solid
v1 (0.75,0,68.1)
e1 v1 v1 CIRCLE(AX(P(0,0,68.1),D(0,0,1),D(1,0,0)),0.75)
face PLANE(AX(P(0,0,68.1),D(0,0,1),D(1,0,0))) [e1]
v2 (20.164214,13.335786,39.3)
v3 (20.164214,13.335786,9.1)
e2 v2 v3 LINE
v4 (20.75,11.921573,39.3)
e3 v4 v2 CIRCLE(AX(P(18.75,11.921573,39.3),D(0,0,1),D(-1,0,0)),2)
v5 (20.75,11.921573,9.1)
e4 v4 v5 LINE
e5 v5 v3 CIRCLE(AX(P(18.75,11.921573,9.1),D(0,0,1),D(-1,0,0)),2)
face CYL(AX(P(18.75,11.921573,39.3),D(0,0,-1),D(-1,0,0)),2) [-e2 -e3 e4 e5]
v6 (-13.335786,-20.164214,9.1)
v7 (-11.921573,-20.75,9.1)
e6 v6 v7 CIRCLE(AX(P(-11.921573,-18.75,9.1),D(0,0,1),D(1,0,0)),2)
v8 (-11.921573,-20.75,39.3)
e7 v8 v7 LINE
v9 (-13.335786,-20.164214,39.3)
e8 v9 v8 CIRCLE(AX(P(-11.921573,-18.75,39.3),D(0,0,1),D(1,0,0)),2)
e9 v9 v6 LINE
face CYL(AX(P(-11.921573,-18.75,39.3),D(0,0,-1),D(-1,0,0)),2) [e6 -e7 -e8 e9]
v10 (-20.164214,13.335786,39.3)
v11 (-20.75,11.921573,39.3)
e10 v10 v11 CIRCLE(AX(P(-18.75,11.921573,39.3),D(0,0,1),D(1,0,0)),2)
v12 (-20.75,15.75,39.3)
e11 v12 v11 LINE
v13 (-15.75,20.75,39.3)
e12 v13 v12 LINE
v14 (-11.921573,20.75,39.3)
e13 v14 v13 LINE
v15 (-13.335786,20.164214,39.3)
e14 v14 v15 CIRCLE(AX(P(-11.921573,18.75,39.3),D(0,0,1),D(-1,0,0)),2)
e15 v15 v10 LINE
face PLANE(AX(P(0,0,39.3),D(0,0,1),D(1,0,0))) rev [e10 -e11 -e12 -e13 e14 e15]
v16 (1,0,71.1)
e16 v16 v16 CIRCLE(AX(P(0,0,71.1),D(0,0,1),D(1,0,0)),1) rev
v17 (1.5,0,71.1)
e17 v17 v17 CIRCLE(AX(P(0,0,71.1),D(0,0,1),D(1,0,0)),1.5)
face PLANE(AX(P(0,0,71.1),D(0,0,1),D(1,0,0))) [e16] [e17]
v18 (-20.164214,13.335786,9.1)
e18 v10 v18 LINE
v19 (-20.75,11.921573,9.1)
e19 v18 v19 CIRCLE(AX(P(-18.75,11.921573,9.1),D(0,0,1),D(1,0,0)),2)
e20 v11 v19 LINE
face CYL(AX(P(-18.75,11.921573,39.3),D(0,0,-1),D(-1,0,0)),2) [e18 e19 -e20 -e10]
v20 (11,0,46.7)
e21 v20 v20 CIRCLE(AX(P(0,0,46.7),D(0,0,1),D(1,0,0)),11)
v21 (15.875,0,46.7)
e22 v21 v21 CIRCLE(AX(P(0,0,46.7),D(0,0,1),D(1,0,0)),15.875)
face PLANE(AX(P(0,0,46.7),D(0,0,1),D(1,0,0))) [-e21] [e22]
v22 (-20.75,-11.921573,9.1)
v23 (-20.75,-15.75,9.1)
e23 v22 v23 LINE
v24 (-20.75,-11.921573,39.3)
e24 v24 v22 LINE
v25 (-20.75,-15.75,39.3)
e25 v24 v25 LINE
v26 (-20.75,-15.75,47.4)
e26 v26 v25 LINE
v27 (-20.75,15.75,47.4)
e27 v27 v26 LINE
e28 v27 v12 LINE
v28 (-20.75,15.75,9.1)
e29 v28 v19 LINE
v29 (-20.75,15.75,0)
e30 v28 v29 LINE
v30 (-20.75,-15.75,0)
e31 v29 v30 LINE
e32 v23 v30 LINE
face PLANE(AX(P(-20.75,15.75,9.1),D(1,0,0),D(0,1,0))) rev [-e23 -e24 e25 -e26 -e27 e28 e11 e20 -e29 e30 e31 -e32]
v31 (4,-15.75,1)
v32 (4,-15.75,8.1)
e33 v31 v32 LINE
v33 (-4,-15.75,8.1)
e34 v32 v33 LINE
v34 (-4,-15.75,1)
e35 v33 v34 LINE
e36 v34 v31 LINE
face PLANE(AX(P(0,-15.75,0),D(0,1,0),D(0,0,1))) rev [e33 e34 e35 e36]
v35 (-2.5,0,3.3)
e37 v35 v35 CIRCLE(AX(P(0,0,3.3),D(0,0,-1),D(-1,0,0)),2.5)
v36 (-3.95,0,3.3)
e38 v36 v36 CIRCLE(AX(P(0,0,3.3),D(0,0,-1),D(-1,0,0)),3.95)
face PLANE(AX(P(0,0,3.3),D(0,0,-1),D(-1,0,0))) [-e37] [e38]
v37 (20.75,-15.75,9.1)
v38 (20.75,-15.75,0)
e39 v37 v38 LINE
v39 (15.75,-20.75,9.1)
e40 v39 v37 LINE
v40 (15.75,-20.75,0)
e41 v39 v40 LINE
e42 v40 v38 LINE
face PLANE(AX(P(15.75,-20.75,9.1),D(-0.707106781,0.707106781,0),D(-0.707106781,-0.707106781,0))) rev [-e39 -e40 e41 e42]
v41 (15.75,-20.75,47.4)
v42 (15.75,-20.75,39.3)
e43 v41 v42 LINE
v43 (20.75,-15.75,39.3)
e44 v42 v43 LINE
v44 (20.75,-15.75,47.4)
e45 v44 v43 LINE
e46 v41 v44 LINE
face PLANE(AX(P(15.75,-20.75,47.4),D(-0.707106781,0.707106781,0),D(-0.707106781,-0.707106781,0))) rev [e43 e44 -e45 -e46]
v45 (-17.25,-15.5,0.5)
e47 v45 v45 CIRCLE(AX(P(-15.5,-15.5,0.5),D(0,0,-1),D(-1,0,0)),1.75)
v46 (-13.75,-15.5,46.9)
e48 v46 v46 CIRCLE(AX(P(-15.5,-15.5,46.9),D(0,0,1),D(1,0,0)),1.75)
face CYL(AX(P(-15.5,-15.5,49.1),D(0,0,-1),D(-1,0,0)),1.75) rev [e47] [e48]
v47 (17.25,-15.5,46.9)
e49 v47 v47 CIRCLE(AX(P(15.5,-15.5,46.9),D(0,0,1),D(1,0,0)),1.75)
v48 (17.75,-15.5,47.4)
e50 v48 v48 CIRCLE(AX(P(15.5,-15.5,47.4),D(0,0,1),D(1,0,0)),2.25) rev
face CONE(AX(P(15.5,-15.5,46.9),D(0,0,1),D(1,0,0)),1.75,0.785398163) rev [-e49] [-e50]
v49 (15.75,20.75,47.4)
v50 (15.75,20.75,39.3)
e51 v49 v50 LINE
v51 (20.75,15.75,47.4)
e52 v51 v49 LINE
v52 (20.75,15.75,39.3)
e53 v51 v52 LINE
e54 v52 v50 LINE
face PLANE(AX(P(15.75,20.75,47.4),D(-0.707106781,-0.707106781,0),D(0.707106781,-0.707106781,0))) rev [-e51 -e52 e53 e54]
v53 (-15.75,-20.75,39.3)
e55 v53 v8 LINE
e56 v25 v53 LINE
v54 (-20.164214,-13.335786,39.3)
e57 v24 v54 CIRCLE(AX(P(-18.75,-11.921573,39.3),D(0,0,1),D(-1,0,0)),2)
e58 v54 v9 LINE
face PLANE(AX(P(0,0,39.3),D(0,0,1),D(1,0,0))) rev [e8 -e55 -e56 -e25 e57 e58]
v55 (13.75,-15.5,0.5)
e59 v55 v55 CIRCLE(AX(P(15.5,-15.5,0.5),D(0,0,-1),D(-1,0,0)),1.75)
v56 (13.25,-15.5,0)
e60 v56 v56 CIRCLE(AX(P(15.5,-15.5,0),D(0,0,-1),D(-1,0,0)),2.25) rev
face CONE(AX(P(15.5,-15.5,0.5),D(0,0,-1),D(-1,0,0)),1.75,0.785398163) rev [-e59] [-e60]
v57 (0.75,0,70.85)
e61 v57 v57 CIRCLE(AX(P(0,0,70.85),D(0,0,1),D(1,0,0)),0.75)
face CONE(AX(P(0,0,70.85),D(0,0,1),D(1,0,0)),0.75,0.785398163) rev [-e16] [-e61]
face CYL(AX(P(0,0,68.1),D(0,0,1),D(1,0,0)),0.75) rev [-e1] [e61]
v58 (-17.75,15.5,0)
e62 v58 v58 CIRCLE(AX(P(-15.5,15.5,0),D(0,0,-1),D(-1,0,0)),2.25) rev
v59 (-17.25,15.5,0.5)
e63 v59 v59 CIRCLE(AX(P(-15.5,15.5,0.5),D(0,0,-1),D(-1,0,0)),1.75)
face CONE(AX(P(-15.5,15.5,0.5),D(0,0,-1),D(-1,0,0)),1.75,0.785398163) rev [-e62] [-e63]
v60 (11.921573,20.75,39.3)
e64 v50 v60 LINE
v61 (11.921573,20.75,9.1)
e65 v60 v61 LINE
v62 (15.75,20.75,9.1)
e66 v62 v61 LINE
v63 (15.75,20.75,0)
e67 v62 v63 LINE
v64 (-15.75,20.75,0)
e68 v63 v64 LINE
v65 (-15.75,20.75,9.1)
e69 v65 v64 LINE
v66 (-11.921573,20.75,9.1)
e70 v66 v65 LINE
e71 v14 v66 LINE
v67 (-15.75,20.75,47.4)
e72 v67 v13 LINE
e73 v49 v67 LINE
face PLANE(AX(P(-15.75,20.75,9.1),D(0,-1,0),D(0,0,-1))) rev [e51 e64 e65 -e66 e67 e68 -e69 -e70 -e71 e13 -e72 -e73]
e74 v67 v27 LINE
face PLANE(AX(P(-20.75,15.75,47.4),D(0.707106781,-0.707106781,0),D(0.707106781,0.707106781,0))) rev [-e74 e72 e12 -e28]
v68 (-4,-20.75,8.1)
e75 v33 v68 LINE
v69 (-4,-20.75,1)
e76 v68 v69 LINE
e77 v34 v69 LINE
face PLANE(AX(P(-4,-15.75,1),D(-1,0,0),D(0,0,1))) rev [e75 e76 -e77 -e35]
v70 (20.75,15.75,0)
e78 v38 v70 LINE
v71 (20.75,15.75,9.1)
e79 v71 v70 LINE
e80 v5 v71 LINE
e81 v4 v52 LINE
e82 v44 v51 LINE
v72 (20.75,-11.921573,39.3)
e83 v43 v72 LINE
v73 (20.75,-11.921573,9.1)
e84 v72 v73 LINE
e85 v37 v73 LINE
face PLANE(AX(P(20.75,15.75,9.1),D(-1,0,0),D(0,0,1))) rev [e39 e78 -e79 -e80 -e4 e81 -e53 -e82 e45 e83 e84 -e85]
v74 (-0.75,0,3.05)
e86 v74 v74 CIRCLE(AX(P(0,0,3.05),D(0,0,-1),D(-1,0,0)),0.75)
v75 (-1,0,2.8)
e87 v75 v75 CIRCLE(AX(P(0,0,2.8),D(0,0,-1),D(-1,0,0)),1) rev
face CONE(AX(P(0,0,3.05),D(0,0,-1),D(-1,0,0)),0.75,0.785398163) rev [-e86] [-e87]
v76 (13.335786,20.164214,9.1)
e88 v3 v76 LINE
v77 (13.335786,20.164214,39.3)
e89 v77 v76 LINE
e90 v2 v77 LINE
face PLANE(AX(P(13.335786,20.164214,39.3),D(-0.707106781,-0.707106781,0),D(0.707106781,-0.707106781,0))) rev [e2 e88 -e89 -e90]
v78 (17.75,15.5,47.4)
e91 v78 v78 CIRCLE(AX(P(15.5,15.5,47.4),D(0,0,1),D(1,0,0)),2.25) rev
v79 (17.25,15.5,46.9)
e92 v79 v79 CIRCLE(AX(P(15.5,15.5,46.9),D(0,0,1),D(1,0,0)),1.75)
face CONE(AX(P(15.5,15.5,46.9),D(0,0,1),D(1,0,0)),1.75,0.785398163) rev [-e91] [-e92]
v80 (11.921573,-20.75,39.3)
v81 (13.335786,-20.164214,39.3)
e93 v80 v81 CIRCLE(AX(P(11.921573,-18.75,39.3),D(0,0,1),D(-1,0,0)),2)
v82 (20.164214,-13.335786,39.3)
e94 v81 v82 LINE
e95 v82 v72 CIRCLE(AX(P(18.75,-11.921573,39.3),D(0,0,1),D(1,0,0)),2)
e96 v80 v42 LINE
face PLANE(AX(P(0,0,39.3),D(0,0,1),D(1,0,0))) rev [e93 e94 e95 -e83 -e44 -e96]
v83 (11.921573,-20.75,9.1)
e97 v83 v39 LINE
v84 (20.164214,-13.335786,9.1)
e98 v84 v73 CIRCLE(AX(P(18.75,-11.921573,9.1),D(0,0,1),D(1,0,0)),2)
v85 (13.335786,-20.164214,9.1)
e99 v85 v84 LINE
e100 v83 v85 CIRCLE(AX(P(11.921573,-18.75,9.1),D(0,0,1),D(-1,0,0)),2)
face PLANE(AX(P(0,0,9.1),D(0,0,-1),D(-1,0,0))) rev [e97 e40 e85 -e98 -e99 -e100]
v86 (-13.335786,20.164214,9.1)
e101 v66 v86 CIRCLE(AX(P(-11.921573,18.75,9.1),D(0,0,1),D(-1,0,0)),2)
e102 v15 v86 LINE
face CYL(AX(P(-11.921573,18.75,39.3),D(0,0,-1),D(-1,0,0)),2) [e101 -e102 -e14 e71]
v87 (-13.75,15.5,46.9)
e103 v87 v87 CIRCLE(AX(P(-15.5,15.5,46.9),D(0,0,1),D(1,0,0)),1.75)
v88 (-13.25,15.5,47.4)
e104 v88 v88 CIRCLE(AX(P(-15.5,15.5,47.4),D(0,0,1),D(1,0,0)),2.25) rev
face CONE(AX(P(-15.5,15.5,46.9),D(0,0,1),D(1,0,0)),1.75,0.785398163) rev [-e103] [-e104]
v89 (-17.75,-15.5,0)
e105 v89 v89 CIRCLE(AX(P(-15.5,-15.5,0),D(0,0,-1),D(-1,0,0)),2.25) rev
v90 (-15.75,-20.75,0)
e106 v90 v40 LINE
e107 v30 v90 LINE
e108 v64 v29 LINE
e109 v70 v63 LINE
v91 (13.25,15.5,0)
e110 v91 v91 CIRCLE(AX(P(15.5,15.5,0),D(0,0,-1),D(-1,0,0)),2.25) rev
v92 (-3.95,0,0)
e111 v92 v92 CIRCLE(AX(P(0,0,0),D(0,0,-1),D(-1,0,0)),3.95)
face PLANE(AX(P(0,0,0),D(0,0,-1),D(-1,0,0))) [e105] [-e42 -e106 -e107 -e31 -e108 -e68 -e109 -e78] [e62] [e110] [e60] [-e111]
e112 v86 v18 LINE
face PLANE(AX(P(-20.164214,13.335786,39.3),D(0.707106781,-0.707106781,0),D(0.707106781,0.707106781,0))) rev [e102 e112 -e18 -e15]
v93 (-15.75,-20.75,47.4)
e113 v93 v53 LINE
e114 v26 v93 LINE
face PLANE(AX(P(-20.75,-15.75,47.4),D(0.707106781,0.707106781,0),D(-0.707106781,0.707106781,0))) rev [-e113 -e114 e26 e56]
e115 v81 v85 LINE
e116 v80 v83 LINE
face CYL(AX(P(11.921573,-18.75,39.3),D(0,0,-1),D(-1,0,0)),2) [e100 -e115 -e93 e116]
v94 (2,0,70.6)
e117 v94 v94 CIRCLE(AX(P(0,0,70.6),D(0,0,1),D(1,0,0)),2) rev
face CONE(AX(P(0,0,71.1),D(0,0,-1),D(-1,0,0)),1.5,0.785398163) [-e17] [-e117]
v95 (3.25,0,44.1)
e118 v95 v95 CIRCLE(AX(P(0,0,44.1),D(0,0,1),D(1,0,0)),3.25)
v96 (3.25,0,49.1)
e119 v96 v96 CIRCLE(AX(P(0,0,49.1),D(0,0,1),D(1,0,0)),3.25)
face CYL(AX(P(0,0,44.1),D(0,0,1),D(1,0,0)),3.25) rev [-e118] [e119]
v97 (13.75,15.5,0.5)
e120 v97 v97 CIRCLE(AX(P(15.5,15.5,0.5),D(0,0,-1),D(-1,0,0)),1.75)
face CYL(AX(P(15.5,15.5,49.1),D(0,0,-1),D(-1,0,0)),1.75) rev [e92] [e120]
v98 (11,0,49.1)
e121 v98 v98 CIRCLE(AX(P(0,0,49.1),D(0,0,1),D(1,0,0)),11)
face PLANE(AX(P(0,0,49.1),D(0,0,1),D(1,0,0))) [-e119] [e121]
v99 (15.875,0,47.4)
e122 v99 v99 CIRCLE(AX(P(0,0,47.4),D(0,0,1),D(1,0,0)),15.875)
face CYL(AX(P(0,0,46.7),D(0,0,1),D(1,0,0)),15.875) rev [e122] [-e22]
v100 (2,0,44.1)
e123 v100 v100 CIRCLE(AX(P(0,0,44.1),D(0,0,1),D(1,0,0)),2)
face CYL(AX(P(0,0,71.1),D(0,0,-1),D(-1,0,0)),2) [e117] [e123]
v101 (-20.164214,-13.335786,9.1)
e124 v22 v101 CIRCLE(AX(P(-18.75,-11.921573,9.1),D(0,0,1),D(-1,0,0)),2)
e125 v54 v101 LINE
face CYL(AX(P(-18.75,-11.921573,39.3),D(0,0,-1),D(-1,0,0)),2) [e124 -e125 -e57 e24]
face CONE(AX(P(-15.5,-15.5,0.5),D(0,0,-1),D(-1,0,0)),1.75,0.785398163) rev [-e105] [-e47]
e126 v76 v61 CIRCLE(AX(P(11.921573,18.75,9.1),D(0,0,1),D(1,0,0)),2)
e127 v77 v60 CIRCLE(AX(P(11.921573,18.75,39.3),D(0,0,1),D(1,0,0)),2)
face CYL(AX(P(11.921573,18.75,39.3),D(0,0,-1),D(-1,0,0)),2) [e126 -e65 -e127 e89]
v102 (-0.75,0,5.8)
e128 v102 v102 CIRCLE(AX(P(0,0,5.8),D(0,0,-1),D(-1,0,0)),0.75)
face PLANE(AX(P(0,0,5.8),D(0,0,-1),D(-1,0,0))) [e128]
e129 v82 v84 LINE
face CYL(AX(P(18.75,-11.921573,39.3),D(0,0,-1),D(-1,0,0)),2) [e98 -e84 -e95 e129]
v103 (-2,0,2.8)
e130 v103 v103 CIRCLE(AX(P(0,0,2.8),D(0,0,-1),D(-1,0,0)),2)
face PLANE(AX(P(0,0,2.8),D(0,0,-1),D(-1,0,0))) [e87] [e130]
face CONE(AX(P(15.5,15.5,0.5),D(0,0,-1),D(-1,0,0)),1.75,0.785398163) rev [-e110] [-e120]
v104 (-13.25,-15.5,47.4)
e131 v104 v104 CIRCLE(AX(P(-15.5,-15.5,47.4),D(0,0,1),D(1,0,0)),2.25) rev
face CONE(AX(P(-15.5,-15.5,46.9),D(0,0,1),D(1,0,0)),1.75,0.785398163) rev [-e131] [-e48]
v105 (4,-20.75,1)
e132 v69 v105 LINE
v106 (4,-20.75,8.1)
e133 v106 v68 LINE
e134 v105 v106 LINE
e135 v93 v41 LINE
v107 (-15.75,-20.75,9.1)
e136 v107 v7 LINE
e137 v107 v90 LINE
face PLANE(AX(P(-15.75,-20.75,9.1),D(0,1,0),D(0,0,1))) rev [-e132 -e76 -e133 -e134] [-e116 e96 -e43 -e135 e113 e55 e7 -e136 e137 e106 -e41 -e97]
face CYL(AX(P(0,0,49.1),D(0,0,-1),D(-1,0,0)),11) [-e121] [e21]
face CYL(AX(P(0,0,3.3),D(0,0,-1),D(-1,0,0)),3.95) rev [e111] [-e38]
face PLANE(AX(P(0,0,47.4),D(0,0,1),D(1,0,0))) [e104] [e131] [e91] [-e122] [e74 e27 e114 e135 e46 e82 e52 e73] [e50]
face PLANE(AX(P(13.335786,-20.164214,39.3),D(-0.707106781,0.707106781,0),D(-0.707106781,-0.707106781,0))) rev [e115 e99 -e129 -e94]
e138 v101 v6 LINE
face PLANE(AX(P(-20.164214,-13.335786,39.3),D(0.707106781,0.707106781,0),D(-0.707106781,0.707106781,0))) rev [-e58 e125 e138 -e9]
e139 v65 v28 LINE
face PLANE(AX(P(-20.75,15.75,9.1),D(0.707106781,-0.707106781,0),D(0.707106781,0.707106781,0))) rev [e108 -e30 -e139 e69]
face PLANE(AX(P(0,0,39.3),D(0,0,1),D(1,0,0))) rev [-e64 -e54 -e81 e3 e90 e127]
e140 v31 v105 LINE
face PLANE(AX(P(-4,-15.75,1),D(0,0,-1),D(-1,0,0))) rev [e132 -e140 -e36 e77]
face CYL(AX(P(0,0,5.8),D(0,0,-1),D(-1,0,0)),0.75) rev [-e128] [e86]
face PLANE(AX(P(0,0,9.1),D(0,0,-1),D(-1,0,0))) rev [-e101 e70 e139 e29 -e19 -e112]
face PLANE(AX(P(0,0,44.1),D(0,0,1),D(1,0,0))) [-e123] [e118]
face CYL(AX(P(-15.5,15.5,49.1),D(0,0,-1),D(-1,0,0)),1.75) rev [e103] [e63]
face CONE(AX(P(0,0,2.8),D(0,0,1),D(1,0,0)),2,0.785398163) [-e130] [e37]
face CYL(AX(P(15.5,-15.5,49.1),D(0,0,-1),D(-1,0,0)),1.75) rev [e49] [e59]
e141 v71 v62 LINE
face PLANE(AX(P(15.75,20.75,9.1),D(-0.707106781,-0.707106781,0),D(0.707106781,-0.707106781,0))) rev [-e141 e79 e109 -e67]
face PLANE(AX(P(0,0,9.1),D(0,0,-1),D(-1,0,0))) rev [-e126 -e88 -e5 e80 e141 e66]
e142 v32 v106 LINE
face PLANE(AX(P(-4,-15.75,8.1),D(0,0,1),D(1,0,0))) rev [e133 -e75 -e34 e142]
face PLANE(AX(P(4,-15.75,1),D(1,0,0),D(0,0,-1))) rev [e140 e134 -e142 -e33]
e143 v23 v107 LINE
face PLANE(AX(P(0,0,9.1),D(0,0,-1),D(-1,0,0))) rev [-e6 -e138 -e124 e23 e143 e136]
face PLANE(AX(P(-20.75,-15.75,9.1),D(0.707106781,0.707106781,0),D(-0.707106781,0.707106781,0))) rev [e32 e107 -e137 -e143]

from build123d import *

# Parameters (mm, degrees)
BOSS_EXTRUDE1_DEPTH = 9.1
BOSS_EXTRUDE2_DEPTH = 30.2
BOSS_EXTRUDE3_DEPTH = 8.1
SKETCH4_R           = 15.875
CUT_EXTRUDE1_DEPTH  = 0.7
SKETCH5_R           = 11
BOSS_EXTRUDE4_DEPTH = 2.4
SKETCH6_R           = 1.75
CUT_EXTRUDE2_DEPTH  = 58.200830414
CHAMFER1_SIZE       = 0.5
SKETCH7_R           = 3.95
CUT_EXTRUDE3_DEPTH  = 3.3
SKETCH8_R           = 3.25
CUT_EXTRUDE4_DEPTH  = 5
SKETCH9_R           = 2
BOSS_EXTRUDE5_DEPTH = 27
CHAMFER2_SIZE       = 0.5
SKETCH10_R          = 0.75
CUT_EXTRUDE5_DEPTH  = 3
CHAMFER3_SIZE       = 0.25
SKETCH11_R          = 2.5
BOSS_EXTRUDE6_DEPTH = 0.5
CHAMFER4_SIZE       = 0.5
CUT_EXTRUDE6_START  = -3
SKETCH12_R          = 0.75
CUT_EXTRUDE6_DEPTH  = 3
CHAMFER5_SIZE       = 0.25
SKETCH14_W          = 8
SKETCH14_H          = 7.1
CUT_EXTRUDE8_DEPTH  = 5


with BuildPart() as part:
    # Sketch1 → Boss-Extrude1 (new body)
    with BuildSketch(Plane.XY):
        Polygon((15.75, 20.75), (20.75, 15.75), (20.75, -15.75), (15.75, -20.75), (-15.75, -20.75), (-20.75, -15.75), (-20.75, 15.75), (-15.75, 20.75), align=None)
    extrude(amount=BOSS_EXTRUDE1_DEPTH)

    # Sketch2 → Boss-Extrude2 (add)
    with BuildSketch(Plane.XY.offset(9.1)):
        with BuildLine():
            Line((13.335786438, 20.164213562), (20.164213562, 13.335786438))
            ThreePointArc((20.164213562, 13.335786438), (20.597759065, 12.68693974), (20.75, 11.921572875))
            Line((20.75, 11.921572875), (20.75, -11.921572875))
            ThreePointArc((20.75, -11.921572875), (20.597759065, -12.68693974), (20.164213562, -13.335786438))
            Line((20.164213562, -13.335786438), (13.335786438, -20.164213562))
            ThreePointArc((13.335786438, -20.164213562), (12.68693974, -20.597759065), (11.921572875, -20.75))
            Line((11.921572875, -20.75), (-11.921572875, -20.75))
            ThreePointArc((-11.921572875, -20.75), (-12.68693974, -20.597759065), (-13.335786438, -20.164213562))
            Line((-13.335786438, -20.164213562), (-20.164213562, -13.335786438))
            ThreePointArc((-20.164213562, -13.335786438), (-20.597759065, -12.68693974), (-20.75, -11.921572875))
            Line((-20.75, -11.921572875), (-20.75, 11.921572875))
            ThreePointArc((-20.75, 11.921572875), (-20.597759065, 12.68693974), (-20.164213562, 13.335786438))
            Line((-20.164213562, 13.335786438), (-13.335786438, 20.164213562))
            ThreePointArc((-13.335786438, 20.164213562), (-12.68693974, 20.597759065), (-11.921572875, 20.75))
            Line((-11.921572875, 20.75), (11.921572875, 20.75))
            ThreePointArc((11.921572875, 20.75), (12.68693974, 20.597759065), (13.335786438, 20.164213562))
        make_face()
    extrude(amount=BOSS_EXTRUDE2_DEPTH)

    # Sketch3 → Boss-Extrude3 (add)
    with BuildSketch(Plane.XY.offset(39.3)):
        Polygon((15.75, 20.75), (20.75, 15.75), (20.75, -15.75), (15.75, -20.75), (-15.75, -20.75), (-20.75, -15.75), (-20.75, 15.75), (-15.75, 20.75), align=None)
    extrude(amount=BOSS_EXTRUDE3_DEPTH)

    # Sketch4 → Cut-Extrude1 (cut)
    with BuildSketch(Plane.XY.offset(47.4)):
        Circle(SKETCH4_R)
    extrude(amount=-CUT_EXTRUDE1_DEPTH, mode=Mode.SUBTRACT)

    # Sketch5 → Boss-Extrude4 (add)
    with BuildSketch(Plane.XY.offset(46.7)):
        Circle(SKETCH5_R)
    extrude(amount=BOSS_EXTRUDE4_DEPTH)

    # Sketch6 → Cut-Extrude2 (cut, through all)
    with BuildSketch(Plane(origin=(0, 0, 0), x_dir=(-1, 0, 0), z_dir=(0, 0, -1))):
        with Locations((-15.5, 15.5)):
            Circle(SKETCH6_R)
        with Locations((-15.5, -15.5)):
            Circle(SKETCH6_R)
        with Locations((15.5, -15.5)):
            Circle(SKETCH6_R)
        with Locations((15.5, 15.5)):
            Circle(SKETCH6_R)
    extrude(amount=-CUT_EXTRUDE2_DEPTH, mode=Mode.SUBTRACT)

    # Chamfer1
    chamfer1_edges = [part.edges().sort_by_distance(p)[0] for p in [
        (17.25, 15.5, 47.4),
        (17.25, 15.5, 0),
        (17.25, -15.5, 47.4),
        (17.25, -15.5, 0),
        (-13.75, -15.5, 47.4),
        (-13.75, -15.5, 0),
        (-13.75, 15.5, 47.4),
        (-13.75, 15.5, 0),
    ]]
    chamfer(chamfer1_edges, length=CHAMFER1_SIZE)

    # Sketch7 → Cut-Extrude3 (cut)
    with BuildSketch(Plane(origin=(0, 0, 0), x_dir=(-1, 0, 0), z_dir=(0, 0, -1))):
        Circle(SKETCH7_R)
    extrude(amount=-CUT_EXTRUDE3_DEPTH, mode=Mode.SUBTRACT)

    # Sketch8 → Cut-Extrude4 (cut)
    with BuildSketch(Plane.XY.offset(49.1)):
        Circle(SKETCH8_R)
    extrude(amount=-CUT_EXTRUDE4_DEPTH, mode=Mode.SUBTRACT)

    # Sketch9 → Boss-Extrude5 (add)
    with BuildSketch(Plane.XY.offset(44.1)):
        Circle(SKETCH9_R)
    extrude(amount=BOSS_EXTRUDE5_DEPTH)

    # Chamfer2
    chamfer2_edges = [part.edges().sort_by_distance(p)[0] for p in [
        (-2, 0, 71.1),
    ]]
    chamfer(chamfer2_edges, length=CHAMFER2_SIZE)

    # Sketch10 → Cut-Extrude5 (cut)
    with BuildSketch(Plane.XY.offset(71.1)):
        Circle(SKETCH10_R)
    extrude(amount=-CUT_EXTRUDE5_DEPTH, mode=Mode.SUBTRACT)

    # Chamfer3
    chamfer3_edges = [part.edges().sort_by_distance(p)[0] for p in [
        (-0.75, 0, 71.1),
    ]]
    chamfer(chamfer3_edges, length=CHAMFER3_SIZE)

    # Sketch11 → Boss-Extrude6 (add)
    with BuildSketch(Plane(origin=(0, 0, 3.3), x_dir=(-1, 0, 0), z_dir=(0, 0, -1))):
        Circle(SKETCH11_R)
    extrude(amount=BOSS_EXTRUDE6_DEPTH)

    # Chamfer4
    chamfer4_edges = [part.edges().sort_by_distance(p)[0] for p in [
        (2.5, 0, 2.8),
    ]]
    chamfer(chamfer4_edges, length=CHAMFER4_SIZE - 0.0001)  # a hair under: the kernel refuses the full size

    # Sketch12 → Cut-Extrude6 (cut)
    with BuildSketch(Plane(origin=(0, 0, 2.8), x_dir=(-1, 0, 0), z_dir=(0, 0, -1)).offset(CUT_EXTRUDE6_START)):
        with Locations(Location((0, 0, 0), (0, 0, 180))):
            Circle(SKETCH12_R)
    extrude(amount=CUT_EXTRUDE6_DEPTH, mode=Mode.SUBTRACT)

    # Chamfer5
    chamfer5_edges = [part.edges().sort_by_distance(p)[0] for p in [
        (-0.75, 0, 2.8),
    ]]
    chamfer(chamfer5_edges, length=CHAMFER5_SIZE)

    # Sketch14 → Cut-Extrude8 (cut)
    with BuildSketch(Plane.XZ.offset(20.75)):
        with Locations((0, 4.55)):
            Rectangle(SKETCH14_W, SKETCH14_H)
    extrude(amount=-CUT_EXTRUDE8_DEPTH, mode=Mode.SUBTRACT)


solid = part.part
